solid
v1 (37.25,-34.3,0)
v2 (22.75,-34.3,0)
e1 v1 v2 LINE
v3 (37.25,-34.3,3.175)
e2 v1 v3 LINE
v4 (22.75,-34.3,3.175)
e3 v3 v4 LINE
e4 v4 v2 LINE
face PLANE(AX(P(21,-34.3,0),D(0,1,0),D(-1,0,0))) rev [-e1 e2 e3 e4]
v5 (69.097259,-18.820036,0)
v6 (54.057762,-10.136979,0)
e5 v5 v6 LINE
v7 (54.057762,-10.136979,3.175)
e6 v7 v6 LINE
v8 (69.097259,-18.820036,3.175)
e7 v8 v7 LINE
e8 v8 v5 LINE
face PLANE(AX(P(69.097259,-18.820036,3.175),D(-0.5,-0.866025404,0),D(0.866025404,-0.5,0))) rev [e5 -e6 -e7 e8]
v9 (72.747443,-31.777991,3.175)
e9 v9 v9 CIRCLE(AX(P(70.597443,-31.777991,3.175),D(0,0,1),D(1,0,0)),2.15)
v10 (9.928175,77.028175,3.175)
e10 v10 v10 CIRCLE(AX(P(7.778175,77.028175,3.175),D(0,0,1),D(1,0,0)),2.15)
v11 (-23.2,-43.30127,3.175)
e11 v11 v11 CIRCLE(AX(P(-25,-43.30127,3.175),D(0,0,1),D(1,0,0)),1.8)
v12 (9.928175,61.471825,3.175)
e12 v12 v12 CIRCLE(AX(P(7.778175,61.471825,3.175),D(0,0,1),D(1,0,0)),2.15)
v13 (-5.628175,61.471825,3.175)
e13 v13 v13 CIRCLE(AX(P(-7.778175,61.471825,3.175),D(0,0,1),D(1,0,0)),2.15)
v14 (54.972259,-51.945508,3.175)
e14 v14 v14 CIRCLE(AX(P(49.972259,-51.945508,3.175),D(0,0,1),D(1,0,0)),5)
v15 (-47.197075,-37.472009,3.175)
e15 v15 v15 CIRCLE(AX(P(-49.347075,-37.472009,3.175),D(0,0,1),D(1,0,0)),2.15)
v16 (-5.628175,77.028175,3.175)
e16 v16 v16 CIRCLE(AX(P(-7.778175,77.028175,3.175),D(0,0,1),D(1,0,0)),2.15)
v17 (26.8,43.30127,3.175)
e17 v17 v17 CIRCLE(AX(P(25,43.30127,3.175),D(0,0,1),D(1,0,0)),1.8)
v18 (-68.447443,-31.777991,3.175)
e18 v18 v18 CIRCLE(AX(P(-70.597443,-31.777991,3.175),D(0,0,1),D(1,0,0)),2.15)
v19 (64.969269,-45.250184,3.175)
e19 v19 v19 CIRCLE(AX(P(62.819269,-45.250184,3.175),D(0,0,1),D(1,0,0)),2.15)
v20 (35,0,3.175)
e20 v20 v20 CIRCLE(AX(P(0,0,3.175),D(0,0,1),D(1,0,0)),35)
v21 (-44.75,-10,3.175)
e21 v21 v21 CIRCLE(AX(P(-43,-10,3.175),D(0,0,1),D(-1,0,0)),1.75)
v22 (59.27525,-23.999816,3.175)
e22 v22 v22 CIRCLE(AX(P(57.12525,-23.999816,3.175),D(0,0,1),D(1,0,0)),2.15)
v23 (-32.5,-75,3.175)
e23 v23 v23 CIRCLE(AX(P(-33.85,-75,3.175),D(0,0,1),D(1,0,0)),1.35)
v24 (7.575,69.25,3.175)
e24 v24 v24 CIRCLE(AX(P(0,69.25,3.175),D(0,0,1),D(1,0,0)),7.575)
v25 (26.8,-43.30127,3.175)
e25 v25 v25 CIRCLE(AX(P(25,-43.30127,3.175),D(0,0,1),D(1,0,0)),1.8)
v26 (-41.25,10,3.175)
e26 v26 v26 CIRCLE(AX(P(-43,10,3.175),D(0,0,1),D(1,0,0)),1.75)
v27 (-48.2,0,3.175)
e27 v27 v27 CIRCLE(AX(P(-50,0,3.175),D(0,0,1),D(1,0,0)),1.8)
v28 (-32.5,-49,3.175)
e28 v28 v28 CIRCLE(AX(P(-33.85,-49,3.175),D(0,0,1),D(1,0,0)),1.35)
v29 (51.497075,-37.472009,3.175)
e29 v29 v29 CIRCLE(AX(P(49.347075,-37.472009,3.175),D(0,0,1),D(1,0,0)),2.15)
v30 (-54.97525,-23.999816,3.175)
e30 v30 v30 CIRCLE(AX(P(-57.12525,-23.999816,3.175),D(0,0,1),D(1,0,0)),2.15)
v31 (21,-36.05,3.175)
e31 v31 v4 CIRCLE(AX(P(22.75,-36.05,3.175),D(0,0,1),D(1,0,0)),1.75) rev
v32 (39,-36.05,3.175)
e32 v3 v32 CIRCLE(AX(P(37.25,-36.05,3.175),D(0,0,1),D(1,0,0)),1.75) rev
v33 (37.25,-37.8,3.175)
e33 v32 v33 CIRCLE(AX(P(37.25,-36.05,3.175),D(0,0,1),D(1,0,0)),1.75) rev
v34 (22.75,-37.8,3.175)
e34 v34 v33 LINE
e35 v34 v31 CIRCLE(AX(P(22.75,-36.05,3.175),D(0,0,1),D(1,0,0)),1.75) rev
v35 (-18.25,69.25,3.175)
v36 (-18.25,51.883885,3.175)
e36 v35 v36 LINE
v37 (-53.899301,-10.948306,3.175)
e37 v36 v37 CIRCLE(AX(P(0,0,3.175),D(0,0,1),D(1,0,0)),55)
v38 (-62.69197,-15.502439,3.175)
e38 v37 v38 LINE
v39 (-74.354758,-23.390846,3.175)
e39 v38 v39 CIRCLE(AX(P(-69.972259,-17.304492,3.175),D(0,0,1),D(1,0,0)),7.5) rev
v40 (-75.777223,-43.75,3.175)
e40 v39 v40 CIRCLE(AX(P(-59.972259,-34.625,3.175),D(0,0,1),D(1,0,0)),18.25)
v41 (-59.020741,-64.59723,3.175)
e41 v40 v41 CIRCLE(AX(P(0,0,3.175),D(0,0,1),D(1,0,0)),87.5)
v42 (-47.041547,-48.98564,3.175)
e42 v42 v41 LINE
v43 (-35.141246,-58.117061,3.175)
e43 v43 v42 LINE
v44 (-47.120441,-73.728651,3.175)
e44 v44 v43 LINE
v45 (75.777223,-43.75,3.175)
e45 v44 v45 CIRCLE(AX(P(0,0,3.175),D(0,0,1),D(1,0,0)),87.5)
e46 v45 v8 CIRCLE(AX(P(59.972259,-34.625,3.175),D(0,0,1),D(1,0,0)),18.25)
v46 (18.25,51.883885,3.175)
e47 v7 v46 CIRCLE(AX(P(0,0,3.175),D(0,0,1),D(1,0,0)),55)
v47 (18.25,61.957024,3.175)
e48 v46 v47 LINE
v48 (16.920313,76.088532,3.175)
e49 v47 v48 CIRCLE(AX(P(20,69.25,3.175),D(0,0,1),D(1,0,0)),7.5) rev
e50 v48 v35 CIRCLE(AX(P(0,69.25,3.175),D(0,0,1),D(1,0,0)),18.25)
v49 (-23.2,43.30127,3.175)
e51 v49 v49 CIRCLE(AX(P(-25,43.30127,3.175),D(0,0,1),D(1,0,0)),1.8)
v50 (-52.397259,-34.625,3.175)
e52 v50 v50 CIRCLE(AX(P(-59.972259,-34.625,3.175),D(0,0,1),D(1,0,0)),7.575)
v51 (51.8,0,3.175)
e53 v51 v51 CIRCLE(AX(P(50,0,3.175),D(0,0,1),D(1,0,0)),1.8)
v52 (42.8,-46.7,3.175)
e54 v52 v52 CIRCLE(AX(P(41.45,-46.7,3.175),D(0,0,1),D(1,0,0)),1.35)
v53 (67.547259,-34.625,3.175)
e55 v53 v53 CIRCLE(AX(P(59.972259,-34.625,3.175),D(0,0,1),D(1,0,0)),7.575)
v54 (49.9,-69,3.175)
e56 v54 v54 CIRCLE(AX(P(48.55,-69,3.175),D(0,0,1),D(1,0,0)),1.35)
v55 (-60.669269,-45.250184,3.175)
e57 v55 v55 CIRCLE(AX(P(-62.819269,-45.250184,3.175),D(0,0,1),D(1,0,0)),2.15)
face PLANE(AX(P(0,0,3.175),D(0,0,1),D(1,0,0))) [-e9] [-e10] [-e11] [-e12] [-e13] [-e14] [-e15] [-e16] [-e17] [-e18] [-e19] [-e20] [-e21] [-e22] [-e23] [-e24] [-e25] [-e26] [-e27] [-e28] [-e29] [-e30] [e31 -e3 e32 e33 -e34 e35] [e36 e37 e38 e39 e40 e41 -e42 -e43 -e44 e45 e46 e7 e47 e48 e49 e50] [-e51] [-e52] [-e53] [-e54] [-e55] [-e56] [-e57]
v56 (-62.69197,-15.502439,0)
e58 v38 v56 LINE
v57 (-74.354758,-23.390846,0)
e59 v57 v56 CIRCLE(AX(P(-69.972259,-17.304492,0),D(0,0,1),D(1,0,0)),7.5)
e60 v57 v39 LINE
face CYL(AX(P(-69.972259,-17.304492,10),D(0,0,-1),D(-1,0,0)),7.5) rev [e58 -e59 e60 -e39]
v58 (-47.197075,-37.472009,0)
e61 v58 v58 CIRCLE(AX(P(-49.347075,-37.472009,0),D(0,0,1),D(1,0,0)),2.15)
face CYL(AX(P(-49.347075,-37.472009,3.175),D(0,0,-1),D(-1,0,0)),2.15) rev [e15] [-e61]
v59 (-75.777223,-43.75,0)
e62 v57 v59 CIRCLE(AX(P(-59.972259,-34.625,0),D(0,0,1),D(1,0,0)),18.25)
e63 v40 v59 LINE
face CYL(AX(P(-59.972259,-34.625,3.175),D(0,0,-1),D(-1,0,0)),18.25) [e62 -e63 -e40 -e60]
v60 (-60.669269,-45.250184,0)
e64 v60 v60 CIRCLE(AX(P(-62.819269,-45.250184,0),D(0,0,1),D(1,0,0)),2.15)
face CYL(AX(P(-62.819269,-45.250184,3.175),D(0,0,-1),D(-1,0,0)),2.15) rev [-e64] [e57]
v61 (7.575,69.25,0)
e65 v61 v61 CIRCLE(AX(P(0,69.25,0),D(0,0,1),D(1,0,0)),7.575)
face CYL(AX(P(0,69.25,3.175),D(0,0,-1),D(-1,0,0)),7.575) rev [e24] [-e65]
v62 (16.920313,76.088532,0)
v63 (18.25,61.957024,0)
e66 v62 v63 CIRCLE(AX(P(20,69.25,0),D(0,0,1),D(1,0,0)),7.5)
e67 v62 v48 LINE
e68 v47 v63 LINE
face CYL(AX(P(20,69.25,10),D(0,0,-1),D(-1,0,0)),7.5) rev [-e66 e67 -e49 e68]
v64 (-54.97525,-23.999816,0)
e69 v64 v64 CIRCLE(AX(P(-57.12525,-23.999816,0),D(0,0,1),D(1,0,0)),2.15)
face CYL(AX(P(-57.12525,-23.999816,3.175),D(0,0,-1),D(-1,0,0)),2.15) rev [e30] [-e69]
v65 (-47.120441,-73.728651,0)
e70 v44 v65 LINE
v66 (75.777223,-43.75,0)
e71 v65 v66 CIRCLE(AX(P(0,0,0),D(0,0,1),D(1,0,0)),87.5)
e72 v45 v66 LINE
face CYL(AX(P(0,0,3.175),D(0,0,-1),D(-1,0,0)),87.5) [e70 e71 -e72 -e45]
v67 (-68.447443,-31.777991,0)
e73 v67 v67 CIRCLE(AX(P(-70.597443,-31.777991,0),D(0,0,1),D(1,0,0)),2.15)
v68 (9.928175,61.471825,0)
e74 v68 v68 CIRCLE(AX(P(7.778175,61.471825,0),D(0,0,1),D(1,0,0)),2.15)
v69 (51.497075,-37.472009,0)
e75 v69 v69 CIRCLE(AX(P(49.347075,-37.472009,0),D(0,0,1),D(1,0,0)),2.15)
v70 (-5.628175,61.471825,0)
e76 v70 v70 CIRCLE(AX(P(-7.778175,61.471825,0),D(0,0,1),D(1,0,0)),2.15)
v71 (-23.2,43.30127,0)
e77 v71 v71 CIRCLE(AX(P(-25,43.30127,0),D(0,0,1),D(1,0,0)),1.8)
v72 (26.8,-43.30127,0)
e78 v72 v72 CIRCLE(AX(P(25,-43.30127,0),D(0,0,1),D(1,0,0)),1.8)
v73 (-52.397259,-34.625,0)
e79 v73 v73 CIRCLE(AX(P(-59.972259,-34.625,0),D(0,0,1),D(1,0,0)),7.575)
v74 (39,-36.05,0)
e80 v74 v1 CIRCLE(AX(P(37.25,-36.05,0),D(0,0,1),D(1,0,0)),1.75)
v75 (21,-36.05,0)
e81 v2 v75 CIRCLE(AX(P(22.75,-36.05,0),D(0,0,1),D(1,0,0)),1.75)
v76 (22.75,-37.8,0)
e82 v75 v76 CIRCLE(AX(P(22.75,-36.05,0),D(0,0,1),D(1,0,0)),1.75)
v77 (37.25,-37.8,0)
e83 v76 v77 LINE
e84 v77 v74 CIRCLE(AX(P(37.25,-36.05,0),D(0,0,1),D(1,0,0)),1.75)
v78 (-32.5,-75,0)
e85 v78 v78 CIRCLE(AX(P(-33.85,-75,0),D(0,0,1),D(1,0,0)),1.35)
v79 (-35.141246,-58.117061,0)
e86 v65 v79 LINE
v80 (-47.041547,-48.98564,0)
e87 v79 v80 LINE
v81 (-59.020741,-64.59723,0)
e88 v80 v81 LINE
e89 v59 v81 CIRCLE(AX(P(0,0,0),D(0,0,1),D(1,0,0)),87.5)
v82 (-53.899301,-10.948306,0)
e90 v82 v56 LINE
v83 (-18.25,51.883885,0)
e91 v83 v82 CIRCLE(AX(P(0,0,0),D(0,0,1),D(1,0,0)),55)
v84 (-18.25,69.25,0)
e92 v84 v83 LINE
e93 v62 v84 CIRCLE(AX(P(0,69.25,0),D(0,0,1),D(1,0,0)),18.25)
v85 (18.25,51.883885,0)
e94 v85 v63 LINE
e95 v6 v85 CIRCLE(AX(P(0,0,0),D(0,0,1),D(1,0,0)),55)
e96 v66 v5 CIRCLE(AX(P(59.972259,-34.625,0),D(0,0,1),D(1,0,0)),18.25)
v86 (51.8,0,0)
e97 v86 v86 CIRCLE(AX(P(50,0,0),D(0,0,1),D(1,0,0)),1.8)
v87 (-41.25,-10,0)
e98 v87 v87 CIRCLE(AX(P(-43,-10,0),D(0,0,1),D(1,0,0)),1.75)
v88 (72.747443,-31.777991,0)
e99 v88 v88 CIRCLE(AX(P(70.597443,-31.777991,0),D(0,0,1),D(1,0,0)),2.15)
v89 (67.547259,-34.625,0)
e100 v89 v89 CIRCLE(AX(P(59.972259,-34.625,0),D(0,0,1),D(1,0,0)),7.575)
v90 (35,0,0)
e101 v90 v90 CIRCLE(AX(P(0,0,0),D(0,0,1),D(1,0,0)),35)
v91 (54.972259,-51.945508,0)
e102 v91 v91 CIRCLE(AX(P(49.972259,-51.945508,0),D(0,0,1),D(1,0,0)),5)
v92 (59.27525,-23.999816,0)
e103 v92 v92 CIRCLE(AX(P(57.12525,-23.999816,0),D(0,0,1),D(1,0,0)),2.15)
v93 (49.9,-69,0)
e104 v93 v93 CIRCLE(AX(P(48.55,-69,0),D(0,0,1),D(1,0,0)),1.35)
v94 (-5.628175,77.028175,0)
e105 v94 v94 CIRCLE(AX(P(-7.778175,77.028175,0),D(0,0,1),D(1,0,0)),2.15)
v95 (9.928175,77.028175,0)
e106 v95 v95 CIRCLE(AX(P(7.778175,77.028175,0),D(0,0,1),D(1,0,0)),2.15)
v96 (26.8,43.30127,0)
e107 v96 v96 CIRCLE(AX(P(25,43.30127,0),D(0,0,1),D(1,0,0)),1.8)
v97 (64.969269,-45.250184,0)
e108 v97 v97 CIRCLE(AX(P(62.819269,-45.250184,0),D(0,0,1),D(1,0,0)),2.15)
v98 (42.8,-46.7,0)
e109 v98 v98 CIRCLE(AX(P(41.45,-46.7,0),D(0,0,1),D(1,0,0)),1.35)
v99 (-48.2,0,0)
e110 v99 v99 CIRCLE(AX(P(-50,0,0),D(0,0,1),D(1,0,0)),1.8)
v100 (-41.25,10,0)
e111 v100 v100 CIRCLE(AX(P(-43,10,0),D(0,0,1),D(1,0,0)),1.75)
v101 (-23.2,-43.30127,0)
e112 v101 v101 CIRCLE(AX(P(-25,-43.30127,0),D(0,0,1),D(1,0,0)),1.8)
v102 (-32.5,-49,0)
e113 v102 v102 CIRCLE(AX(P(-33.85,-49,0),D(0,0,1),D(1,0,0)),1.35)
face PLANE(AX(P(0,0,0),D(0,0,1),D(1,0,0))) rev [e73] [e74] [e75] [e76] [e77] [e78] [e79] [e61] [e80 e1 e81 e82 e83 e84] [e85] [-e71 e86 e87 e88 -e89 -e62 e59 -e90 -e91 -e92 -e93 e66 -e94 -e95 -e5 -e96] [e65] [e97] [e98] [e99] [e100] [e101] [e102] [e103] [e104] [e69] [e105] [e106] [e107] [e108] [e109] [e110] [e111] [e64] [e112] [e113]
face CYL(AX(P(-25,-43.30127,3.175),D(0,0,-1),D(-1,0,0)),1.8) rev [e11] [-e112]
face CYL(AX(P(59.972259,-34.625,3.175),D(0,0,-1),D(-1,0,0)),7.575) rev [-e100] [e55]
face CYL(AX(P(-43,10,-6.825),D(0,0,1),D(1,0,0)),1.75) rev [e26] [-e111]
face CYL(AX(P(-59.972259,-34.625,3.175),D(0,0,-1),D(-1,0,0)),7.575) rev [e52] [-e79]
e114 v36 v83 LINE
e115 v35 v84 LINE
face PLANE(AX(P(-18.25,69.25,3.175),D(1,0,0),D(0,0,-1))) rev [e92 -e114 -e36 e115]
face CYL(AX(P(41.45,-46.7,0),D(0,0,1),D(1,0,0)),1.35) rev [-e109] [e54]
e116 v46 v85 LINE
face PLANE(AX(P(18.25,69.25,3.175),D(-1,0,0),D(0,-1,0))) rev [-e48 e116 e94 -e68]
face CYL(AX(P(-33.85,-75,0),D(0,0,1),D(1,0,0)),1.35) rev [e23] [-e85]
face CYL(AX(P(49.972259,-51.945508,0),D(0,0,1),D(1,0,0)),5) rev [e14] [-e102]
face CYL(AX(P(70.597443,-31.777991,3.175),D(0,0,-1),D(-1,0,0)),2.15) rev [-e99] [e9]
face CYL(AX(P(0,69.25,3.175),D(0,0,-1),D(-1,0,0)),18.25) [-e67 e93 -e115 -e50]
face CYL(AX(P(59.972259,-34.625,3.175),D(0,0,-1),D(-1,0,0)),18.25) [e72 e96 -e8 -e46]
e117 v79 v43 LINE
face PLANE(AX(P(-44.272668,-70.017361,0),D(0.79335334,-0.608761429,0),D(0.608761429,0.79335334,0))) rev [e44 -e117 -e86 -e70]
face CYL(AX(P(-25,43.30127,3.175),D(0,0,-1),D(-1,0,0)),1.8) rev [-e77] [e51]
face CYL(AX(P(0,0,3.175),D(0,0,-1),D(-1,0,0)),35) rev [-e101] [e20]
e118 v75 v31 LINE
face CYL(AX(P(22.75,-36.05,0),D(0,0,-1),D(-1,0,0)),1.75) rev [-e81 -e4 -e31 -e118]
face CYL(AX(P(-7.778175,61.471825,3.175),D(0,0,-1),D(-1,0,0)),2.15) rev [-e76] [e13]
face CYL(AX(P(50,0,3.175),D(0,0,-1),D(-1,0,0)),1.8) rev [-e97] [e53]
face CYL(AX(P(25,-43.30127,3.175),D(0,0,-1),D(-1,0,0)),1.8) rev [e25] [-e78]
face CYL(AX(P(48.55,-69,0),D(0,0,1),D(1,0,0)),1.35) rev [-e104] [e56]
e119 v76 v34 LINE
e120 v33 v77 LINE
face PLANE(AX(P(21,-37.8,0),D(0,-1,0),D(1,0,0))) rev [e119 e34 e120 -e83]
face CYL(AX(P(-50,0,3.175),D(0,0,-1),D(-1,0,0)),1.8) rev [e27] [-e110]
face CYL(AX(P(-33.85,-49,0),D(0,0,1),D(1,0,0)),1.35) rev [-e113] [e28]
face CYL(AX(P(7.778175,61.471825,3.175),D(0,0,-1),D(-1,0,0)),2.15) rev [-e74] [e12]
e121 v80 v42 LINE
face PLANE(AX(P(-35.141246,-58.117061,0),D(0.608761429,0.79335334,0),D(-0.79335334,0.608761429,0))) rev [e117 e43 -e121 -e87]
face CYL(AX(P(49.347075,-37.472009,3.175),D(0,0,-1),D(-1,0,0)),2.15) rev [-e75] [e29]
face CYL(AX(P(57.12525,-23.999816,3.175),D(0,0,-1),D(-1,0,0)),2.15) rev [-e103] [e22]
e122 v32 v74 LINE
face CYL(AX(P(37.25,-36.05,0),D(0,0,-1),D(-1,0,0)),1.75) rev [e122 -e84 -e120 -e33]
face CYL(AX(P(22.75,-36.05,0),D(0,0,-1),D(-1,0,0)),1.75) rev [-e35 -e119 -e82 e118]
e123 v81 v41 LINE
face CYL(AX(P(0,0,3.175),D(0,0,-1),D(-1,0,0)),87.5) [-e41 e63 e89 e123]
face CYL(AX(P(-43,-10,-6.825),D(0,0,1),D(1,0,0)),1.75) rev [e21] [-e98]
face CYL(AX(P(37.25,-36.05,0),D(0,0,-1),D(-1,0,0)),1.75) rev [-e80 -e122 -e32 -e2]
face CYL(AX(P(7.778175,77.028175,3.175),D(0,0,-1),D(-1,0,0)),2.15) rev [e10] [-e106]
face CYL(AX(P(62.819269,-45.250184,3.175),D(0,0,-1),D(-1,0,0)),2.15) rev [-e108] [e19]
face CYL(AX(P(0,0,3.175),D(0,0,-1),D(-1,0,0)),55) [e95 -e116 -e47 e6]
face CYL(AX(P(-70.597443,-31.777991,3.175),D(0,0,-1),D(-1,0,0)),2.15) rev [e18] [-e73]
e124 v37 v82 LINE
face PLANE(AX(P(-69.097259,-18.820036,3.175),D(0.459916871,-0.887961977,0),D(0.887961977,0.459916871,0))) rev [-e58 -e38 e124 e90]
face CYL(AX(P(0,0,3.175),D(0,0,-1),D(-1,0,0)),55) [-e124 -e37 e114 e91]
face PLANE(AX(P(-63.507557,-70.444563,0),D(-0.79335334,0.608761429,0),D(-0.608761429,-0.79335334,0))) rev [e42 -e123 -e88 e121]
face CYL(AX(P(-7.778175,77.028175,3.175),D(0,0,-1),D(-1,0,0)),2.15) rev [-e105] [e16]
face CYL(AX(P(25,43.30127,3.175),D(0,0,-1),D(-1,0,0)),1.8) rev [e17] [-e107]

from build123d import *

# Parameters (mm, degrees)
SKETCH1_R           = 2.150000002
SKETCH1_R_2         = 35
SKETCH1_R_3         = 1.8
SKETCH1_R_4         = 7.575
BOSS_EXTRUDE1_DEPTH = 3.175
SKETCH3_R           = 1.35
SKETCH3_R_2         = 5
SKETCH3_W           = 18
SKETCH3_H           = 3.5
CUT_EXTRUDE1_DEPTH  = 3.175
CUT_EXTRUDE2_DEPTH  = 3.175
SKETCH6_R           = 7.5
CUT_EXTRUDE5_DEPTH  = 10
FILLET1_R           = 1.75
SKETCH7_R           = 1.75
CUT_EXTRUDE6_DEPTH  = 10


with BuildPart() as part:
    # Sketch1 → Boss-Extrude1 (new body)
    with BuildSketch(Plane.XY):
        with BuildLine():
            Line((69.097259206, -18.820036388), (54.057762213, -10.136978751))
            ThreePointArc((54.057762213, -10.136978751), (47.631397163, 27.499999965), (18.250000006, 51.883884719))
            Line((18.250000006, 51.883884719), (18.250000006, 69.249999994))
            ThreePointArc((18.250000006, 69.249999994), (6e-09, 87.499999994), (-18.249999994, 69.249999994))
            Line((-18.249999994, 69.249999994), (-18.249999994, 51.883884717))
            ThreePointArc((-18.249999994, 51.883884717), (-47.836716311, 27.141270525), (-53.899300523, -10.948305635))
            Line((-53.899300523, -10.948305635), (-69.097259204, -18.820036383))
            ThreePointArc((-69.097259204, -18.820036383), (-77.600405532, -29.901552426), (-75.777222821, -43.749999994))
            ThreePointArc((-75.777222821, -43.749999994), (0, -87.499999989), (75.777222821, -43.749999994))
            ThreePointArc((75.777222821, -43.749999994), (77.60040553, -29.901552429), (69.097259206, -18.820036388))
        make_face()
        with Locations((-7.778174593, 77.028174587)):
            Circle(SKETCH1_R, mode=Mode.SUBTRACT)
        Circle(SKETCH1_R_2, mode=Mode.SUBTRACT)
        with Locations((-50, 0)):
            Circle(SKETCH1_R_3, mode=Mode.SUBTRACT)
        with Locations((-25, 43.301270189)):
            Circle(SKETCH1_R_3, mode=Mode.SUBTRACT)
        with Locations((25, 43.301270189)):
            Circle(SKETCH1_R_3, mode=Mode.SUBTRACT)
        with Locations((50, 0)):
            Circle(SKETCH1_R_3, mode=Mode.SUBTRACT)
        with Locations((25, -43.301270189)):
            Circle(SKETCH1_R_3, mode=Mode.SUBTRACT)
        with Locations((-25, -43.301270189)):
            Circle(SKETCH1_R_3, mode=Mode.SUBTRACT)
        with Locations((7.778174587, 77.028174593)):
            Circle(SKETCH1_R, mode=Mode.SUBTRACT)
        with Locations((7.778174593, 61.471825413)):
            Circle(SKETCH1_R, mode=Mode.SUBTRACT)
        with Locations((-7.778174587, 61.471825407)):
            Circle(SKETCH1_R, mode=Mode.SUBTRACT)
        with Locations((62.819268711, -45.250184084)):
            Circle(SKETCH1_R, mode=Mode.SUBTRACT)
        with Locations((49.347075128, -37.472009499)):
            Circle(SKETCH1_R, mode=Mode.SUBTRACT)
        with Locations((57.125249713, -23.999815916)):
            Circle(SKETCH1_R, mode=Mode.SUBTRACT)
        with Locations((70.597443296, -31.777990501)):
            Circle(SKETCH1_R, mode=Mode.SUBTRACT)
        with Locations((-70.597443298, -31.777990509)):
            Circle(SKETCH1_R, mode=Mode.SUBTRACT)
        with Locations((-57.125249721, -23.999815914)):
            Circle(SKETCH1_R, mode=Mode.SUBTRACT)
        with Locations((-49.347075126, -37.472009491)):
            Circle(SKETCH1_R, mode=Mode.SUBTRACT)
        with Locations((-62.819268703, -45.250184086)):
            Circle(SKETCH1_R, mode=Mode.SUBTRACT)
        with Locations((0, 69.249999994)):
            Circle(SKETCH1_R_4, mode=Mode.SUBTRACT)
        with Locations((59.972259207, -34.624999997)):
            Circle(SKETCH1_R_4, mode=Mode.SUBTRACT)
        with Locations((-59.972259207, -34.624999997)):
            Circle(SKETCH1_R_4, mode=Mode.SUBTRACT)
    extrude(amount=BOSS_EXTRUDE1_DEPTH)

    # Sketch3 → Cut-Extrude1 (cut)
    with BuildSketch(Plane.XY.offset(3.175)):
        with Locations((-33.85, -49)):
            Circle(SKETCH3_R)
        with Locations((-33.85, -75)):
            Circle(SKETCH3_R)
        with Locations((41.45, -46.7)):
            Circle(SKETCH3_R)
        with Locations((49.972259207, -51.945508073)):
            Circle(SKETCH3_R_2)
        with Locations((48.55, -69)):
            Circle(SKETCH3_R)
        with Locations((30, -36.05)):
            Rectangle(SKETCH3_W, SKETCH3_H)
    extrude(amount=-CUT_EXTRUDE1_DEPTH, mode=Mode.SUBTRACT)

    # Sketch4 → Cut-Extrude2 (cut)
    with BuildSketch(Plane.XY.offset(3.175)):
        Polygon((-18.902035191, 65.231994187), (-24.642286676, 79.090187175), (-38.500479664, 73.349935689), (-32.760228178, 59.491742702), align=None)
        Polygon((-47.04154651, -48.985639752), (-56.172967945, -60.885939856), (-63.507557332, -70.444562845), (-51.607257228, -79.57598428), (-44.272667841, -70.017361292), (-35.141246406, -58.117061187), align=None)
        Polygon((65.943581701, -16.246354435), (80.815254622, -18.204247318), (82.773147505, -3.332574398), (67.901474584, -1.374681515), align=None)
    extrude(amount=-CUT_EXTRUDE2_DEPTH, mode=Mode.SUBTRACT)

    # Sketch6 → Cut-Extrude5 (cut)
    with BuildSketch(Plane.XY):
        with Locations((20, 69.25)):
            Circle(SKETCH6_R)
        with Locations((-69.972259212, -17.304491924)):
            Circle(SKETCH6_R)
    extrude(amount=CUT_EXTRUDE5_DEPTH, mode=Mode.SUBTRACT)

    # Fillet1
    fillet1_edges = [part.edges().sort_by_distance(p)[0] for p in [
        (21, -37.8, 1.5875),
        (39, -37.8, 1.5875),
        (39, -34.3, 1.5875),
        (21, -34.3, 1.5875),
    ]]
    fillet(fillet1_edges, radius=FILLET1_R - 0.0001)  # a hair under: the kernel refuses the full size

    # Sketch7 → Cut-Extrude6 (cut)
    with BuildSketch(Plane.XY.offset(3.175)):
        with Locations((-43, 10)):
            Circle(SKETCH7_R)
        with Locations((-43, -10)):
            Circle(SKETCH7_R)
    extrude(amount=-CUT_EXTRUDE6_DEPTH, mode=Mode.SUBTRACT)


solid = part.part
